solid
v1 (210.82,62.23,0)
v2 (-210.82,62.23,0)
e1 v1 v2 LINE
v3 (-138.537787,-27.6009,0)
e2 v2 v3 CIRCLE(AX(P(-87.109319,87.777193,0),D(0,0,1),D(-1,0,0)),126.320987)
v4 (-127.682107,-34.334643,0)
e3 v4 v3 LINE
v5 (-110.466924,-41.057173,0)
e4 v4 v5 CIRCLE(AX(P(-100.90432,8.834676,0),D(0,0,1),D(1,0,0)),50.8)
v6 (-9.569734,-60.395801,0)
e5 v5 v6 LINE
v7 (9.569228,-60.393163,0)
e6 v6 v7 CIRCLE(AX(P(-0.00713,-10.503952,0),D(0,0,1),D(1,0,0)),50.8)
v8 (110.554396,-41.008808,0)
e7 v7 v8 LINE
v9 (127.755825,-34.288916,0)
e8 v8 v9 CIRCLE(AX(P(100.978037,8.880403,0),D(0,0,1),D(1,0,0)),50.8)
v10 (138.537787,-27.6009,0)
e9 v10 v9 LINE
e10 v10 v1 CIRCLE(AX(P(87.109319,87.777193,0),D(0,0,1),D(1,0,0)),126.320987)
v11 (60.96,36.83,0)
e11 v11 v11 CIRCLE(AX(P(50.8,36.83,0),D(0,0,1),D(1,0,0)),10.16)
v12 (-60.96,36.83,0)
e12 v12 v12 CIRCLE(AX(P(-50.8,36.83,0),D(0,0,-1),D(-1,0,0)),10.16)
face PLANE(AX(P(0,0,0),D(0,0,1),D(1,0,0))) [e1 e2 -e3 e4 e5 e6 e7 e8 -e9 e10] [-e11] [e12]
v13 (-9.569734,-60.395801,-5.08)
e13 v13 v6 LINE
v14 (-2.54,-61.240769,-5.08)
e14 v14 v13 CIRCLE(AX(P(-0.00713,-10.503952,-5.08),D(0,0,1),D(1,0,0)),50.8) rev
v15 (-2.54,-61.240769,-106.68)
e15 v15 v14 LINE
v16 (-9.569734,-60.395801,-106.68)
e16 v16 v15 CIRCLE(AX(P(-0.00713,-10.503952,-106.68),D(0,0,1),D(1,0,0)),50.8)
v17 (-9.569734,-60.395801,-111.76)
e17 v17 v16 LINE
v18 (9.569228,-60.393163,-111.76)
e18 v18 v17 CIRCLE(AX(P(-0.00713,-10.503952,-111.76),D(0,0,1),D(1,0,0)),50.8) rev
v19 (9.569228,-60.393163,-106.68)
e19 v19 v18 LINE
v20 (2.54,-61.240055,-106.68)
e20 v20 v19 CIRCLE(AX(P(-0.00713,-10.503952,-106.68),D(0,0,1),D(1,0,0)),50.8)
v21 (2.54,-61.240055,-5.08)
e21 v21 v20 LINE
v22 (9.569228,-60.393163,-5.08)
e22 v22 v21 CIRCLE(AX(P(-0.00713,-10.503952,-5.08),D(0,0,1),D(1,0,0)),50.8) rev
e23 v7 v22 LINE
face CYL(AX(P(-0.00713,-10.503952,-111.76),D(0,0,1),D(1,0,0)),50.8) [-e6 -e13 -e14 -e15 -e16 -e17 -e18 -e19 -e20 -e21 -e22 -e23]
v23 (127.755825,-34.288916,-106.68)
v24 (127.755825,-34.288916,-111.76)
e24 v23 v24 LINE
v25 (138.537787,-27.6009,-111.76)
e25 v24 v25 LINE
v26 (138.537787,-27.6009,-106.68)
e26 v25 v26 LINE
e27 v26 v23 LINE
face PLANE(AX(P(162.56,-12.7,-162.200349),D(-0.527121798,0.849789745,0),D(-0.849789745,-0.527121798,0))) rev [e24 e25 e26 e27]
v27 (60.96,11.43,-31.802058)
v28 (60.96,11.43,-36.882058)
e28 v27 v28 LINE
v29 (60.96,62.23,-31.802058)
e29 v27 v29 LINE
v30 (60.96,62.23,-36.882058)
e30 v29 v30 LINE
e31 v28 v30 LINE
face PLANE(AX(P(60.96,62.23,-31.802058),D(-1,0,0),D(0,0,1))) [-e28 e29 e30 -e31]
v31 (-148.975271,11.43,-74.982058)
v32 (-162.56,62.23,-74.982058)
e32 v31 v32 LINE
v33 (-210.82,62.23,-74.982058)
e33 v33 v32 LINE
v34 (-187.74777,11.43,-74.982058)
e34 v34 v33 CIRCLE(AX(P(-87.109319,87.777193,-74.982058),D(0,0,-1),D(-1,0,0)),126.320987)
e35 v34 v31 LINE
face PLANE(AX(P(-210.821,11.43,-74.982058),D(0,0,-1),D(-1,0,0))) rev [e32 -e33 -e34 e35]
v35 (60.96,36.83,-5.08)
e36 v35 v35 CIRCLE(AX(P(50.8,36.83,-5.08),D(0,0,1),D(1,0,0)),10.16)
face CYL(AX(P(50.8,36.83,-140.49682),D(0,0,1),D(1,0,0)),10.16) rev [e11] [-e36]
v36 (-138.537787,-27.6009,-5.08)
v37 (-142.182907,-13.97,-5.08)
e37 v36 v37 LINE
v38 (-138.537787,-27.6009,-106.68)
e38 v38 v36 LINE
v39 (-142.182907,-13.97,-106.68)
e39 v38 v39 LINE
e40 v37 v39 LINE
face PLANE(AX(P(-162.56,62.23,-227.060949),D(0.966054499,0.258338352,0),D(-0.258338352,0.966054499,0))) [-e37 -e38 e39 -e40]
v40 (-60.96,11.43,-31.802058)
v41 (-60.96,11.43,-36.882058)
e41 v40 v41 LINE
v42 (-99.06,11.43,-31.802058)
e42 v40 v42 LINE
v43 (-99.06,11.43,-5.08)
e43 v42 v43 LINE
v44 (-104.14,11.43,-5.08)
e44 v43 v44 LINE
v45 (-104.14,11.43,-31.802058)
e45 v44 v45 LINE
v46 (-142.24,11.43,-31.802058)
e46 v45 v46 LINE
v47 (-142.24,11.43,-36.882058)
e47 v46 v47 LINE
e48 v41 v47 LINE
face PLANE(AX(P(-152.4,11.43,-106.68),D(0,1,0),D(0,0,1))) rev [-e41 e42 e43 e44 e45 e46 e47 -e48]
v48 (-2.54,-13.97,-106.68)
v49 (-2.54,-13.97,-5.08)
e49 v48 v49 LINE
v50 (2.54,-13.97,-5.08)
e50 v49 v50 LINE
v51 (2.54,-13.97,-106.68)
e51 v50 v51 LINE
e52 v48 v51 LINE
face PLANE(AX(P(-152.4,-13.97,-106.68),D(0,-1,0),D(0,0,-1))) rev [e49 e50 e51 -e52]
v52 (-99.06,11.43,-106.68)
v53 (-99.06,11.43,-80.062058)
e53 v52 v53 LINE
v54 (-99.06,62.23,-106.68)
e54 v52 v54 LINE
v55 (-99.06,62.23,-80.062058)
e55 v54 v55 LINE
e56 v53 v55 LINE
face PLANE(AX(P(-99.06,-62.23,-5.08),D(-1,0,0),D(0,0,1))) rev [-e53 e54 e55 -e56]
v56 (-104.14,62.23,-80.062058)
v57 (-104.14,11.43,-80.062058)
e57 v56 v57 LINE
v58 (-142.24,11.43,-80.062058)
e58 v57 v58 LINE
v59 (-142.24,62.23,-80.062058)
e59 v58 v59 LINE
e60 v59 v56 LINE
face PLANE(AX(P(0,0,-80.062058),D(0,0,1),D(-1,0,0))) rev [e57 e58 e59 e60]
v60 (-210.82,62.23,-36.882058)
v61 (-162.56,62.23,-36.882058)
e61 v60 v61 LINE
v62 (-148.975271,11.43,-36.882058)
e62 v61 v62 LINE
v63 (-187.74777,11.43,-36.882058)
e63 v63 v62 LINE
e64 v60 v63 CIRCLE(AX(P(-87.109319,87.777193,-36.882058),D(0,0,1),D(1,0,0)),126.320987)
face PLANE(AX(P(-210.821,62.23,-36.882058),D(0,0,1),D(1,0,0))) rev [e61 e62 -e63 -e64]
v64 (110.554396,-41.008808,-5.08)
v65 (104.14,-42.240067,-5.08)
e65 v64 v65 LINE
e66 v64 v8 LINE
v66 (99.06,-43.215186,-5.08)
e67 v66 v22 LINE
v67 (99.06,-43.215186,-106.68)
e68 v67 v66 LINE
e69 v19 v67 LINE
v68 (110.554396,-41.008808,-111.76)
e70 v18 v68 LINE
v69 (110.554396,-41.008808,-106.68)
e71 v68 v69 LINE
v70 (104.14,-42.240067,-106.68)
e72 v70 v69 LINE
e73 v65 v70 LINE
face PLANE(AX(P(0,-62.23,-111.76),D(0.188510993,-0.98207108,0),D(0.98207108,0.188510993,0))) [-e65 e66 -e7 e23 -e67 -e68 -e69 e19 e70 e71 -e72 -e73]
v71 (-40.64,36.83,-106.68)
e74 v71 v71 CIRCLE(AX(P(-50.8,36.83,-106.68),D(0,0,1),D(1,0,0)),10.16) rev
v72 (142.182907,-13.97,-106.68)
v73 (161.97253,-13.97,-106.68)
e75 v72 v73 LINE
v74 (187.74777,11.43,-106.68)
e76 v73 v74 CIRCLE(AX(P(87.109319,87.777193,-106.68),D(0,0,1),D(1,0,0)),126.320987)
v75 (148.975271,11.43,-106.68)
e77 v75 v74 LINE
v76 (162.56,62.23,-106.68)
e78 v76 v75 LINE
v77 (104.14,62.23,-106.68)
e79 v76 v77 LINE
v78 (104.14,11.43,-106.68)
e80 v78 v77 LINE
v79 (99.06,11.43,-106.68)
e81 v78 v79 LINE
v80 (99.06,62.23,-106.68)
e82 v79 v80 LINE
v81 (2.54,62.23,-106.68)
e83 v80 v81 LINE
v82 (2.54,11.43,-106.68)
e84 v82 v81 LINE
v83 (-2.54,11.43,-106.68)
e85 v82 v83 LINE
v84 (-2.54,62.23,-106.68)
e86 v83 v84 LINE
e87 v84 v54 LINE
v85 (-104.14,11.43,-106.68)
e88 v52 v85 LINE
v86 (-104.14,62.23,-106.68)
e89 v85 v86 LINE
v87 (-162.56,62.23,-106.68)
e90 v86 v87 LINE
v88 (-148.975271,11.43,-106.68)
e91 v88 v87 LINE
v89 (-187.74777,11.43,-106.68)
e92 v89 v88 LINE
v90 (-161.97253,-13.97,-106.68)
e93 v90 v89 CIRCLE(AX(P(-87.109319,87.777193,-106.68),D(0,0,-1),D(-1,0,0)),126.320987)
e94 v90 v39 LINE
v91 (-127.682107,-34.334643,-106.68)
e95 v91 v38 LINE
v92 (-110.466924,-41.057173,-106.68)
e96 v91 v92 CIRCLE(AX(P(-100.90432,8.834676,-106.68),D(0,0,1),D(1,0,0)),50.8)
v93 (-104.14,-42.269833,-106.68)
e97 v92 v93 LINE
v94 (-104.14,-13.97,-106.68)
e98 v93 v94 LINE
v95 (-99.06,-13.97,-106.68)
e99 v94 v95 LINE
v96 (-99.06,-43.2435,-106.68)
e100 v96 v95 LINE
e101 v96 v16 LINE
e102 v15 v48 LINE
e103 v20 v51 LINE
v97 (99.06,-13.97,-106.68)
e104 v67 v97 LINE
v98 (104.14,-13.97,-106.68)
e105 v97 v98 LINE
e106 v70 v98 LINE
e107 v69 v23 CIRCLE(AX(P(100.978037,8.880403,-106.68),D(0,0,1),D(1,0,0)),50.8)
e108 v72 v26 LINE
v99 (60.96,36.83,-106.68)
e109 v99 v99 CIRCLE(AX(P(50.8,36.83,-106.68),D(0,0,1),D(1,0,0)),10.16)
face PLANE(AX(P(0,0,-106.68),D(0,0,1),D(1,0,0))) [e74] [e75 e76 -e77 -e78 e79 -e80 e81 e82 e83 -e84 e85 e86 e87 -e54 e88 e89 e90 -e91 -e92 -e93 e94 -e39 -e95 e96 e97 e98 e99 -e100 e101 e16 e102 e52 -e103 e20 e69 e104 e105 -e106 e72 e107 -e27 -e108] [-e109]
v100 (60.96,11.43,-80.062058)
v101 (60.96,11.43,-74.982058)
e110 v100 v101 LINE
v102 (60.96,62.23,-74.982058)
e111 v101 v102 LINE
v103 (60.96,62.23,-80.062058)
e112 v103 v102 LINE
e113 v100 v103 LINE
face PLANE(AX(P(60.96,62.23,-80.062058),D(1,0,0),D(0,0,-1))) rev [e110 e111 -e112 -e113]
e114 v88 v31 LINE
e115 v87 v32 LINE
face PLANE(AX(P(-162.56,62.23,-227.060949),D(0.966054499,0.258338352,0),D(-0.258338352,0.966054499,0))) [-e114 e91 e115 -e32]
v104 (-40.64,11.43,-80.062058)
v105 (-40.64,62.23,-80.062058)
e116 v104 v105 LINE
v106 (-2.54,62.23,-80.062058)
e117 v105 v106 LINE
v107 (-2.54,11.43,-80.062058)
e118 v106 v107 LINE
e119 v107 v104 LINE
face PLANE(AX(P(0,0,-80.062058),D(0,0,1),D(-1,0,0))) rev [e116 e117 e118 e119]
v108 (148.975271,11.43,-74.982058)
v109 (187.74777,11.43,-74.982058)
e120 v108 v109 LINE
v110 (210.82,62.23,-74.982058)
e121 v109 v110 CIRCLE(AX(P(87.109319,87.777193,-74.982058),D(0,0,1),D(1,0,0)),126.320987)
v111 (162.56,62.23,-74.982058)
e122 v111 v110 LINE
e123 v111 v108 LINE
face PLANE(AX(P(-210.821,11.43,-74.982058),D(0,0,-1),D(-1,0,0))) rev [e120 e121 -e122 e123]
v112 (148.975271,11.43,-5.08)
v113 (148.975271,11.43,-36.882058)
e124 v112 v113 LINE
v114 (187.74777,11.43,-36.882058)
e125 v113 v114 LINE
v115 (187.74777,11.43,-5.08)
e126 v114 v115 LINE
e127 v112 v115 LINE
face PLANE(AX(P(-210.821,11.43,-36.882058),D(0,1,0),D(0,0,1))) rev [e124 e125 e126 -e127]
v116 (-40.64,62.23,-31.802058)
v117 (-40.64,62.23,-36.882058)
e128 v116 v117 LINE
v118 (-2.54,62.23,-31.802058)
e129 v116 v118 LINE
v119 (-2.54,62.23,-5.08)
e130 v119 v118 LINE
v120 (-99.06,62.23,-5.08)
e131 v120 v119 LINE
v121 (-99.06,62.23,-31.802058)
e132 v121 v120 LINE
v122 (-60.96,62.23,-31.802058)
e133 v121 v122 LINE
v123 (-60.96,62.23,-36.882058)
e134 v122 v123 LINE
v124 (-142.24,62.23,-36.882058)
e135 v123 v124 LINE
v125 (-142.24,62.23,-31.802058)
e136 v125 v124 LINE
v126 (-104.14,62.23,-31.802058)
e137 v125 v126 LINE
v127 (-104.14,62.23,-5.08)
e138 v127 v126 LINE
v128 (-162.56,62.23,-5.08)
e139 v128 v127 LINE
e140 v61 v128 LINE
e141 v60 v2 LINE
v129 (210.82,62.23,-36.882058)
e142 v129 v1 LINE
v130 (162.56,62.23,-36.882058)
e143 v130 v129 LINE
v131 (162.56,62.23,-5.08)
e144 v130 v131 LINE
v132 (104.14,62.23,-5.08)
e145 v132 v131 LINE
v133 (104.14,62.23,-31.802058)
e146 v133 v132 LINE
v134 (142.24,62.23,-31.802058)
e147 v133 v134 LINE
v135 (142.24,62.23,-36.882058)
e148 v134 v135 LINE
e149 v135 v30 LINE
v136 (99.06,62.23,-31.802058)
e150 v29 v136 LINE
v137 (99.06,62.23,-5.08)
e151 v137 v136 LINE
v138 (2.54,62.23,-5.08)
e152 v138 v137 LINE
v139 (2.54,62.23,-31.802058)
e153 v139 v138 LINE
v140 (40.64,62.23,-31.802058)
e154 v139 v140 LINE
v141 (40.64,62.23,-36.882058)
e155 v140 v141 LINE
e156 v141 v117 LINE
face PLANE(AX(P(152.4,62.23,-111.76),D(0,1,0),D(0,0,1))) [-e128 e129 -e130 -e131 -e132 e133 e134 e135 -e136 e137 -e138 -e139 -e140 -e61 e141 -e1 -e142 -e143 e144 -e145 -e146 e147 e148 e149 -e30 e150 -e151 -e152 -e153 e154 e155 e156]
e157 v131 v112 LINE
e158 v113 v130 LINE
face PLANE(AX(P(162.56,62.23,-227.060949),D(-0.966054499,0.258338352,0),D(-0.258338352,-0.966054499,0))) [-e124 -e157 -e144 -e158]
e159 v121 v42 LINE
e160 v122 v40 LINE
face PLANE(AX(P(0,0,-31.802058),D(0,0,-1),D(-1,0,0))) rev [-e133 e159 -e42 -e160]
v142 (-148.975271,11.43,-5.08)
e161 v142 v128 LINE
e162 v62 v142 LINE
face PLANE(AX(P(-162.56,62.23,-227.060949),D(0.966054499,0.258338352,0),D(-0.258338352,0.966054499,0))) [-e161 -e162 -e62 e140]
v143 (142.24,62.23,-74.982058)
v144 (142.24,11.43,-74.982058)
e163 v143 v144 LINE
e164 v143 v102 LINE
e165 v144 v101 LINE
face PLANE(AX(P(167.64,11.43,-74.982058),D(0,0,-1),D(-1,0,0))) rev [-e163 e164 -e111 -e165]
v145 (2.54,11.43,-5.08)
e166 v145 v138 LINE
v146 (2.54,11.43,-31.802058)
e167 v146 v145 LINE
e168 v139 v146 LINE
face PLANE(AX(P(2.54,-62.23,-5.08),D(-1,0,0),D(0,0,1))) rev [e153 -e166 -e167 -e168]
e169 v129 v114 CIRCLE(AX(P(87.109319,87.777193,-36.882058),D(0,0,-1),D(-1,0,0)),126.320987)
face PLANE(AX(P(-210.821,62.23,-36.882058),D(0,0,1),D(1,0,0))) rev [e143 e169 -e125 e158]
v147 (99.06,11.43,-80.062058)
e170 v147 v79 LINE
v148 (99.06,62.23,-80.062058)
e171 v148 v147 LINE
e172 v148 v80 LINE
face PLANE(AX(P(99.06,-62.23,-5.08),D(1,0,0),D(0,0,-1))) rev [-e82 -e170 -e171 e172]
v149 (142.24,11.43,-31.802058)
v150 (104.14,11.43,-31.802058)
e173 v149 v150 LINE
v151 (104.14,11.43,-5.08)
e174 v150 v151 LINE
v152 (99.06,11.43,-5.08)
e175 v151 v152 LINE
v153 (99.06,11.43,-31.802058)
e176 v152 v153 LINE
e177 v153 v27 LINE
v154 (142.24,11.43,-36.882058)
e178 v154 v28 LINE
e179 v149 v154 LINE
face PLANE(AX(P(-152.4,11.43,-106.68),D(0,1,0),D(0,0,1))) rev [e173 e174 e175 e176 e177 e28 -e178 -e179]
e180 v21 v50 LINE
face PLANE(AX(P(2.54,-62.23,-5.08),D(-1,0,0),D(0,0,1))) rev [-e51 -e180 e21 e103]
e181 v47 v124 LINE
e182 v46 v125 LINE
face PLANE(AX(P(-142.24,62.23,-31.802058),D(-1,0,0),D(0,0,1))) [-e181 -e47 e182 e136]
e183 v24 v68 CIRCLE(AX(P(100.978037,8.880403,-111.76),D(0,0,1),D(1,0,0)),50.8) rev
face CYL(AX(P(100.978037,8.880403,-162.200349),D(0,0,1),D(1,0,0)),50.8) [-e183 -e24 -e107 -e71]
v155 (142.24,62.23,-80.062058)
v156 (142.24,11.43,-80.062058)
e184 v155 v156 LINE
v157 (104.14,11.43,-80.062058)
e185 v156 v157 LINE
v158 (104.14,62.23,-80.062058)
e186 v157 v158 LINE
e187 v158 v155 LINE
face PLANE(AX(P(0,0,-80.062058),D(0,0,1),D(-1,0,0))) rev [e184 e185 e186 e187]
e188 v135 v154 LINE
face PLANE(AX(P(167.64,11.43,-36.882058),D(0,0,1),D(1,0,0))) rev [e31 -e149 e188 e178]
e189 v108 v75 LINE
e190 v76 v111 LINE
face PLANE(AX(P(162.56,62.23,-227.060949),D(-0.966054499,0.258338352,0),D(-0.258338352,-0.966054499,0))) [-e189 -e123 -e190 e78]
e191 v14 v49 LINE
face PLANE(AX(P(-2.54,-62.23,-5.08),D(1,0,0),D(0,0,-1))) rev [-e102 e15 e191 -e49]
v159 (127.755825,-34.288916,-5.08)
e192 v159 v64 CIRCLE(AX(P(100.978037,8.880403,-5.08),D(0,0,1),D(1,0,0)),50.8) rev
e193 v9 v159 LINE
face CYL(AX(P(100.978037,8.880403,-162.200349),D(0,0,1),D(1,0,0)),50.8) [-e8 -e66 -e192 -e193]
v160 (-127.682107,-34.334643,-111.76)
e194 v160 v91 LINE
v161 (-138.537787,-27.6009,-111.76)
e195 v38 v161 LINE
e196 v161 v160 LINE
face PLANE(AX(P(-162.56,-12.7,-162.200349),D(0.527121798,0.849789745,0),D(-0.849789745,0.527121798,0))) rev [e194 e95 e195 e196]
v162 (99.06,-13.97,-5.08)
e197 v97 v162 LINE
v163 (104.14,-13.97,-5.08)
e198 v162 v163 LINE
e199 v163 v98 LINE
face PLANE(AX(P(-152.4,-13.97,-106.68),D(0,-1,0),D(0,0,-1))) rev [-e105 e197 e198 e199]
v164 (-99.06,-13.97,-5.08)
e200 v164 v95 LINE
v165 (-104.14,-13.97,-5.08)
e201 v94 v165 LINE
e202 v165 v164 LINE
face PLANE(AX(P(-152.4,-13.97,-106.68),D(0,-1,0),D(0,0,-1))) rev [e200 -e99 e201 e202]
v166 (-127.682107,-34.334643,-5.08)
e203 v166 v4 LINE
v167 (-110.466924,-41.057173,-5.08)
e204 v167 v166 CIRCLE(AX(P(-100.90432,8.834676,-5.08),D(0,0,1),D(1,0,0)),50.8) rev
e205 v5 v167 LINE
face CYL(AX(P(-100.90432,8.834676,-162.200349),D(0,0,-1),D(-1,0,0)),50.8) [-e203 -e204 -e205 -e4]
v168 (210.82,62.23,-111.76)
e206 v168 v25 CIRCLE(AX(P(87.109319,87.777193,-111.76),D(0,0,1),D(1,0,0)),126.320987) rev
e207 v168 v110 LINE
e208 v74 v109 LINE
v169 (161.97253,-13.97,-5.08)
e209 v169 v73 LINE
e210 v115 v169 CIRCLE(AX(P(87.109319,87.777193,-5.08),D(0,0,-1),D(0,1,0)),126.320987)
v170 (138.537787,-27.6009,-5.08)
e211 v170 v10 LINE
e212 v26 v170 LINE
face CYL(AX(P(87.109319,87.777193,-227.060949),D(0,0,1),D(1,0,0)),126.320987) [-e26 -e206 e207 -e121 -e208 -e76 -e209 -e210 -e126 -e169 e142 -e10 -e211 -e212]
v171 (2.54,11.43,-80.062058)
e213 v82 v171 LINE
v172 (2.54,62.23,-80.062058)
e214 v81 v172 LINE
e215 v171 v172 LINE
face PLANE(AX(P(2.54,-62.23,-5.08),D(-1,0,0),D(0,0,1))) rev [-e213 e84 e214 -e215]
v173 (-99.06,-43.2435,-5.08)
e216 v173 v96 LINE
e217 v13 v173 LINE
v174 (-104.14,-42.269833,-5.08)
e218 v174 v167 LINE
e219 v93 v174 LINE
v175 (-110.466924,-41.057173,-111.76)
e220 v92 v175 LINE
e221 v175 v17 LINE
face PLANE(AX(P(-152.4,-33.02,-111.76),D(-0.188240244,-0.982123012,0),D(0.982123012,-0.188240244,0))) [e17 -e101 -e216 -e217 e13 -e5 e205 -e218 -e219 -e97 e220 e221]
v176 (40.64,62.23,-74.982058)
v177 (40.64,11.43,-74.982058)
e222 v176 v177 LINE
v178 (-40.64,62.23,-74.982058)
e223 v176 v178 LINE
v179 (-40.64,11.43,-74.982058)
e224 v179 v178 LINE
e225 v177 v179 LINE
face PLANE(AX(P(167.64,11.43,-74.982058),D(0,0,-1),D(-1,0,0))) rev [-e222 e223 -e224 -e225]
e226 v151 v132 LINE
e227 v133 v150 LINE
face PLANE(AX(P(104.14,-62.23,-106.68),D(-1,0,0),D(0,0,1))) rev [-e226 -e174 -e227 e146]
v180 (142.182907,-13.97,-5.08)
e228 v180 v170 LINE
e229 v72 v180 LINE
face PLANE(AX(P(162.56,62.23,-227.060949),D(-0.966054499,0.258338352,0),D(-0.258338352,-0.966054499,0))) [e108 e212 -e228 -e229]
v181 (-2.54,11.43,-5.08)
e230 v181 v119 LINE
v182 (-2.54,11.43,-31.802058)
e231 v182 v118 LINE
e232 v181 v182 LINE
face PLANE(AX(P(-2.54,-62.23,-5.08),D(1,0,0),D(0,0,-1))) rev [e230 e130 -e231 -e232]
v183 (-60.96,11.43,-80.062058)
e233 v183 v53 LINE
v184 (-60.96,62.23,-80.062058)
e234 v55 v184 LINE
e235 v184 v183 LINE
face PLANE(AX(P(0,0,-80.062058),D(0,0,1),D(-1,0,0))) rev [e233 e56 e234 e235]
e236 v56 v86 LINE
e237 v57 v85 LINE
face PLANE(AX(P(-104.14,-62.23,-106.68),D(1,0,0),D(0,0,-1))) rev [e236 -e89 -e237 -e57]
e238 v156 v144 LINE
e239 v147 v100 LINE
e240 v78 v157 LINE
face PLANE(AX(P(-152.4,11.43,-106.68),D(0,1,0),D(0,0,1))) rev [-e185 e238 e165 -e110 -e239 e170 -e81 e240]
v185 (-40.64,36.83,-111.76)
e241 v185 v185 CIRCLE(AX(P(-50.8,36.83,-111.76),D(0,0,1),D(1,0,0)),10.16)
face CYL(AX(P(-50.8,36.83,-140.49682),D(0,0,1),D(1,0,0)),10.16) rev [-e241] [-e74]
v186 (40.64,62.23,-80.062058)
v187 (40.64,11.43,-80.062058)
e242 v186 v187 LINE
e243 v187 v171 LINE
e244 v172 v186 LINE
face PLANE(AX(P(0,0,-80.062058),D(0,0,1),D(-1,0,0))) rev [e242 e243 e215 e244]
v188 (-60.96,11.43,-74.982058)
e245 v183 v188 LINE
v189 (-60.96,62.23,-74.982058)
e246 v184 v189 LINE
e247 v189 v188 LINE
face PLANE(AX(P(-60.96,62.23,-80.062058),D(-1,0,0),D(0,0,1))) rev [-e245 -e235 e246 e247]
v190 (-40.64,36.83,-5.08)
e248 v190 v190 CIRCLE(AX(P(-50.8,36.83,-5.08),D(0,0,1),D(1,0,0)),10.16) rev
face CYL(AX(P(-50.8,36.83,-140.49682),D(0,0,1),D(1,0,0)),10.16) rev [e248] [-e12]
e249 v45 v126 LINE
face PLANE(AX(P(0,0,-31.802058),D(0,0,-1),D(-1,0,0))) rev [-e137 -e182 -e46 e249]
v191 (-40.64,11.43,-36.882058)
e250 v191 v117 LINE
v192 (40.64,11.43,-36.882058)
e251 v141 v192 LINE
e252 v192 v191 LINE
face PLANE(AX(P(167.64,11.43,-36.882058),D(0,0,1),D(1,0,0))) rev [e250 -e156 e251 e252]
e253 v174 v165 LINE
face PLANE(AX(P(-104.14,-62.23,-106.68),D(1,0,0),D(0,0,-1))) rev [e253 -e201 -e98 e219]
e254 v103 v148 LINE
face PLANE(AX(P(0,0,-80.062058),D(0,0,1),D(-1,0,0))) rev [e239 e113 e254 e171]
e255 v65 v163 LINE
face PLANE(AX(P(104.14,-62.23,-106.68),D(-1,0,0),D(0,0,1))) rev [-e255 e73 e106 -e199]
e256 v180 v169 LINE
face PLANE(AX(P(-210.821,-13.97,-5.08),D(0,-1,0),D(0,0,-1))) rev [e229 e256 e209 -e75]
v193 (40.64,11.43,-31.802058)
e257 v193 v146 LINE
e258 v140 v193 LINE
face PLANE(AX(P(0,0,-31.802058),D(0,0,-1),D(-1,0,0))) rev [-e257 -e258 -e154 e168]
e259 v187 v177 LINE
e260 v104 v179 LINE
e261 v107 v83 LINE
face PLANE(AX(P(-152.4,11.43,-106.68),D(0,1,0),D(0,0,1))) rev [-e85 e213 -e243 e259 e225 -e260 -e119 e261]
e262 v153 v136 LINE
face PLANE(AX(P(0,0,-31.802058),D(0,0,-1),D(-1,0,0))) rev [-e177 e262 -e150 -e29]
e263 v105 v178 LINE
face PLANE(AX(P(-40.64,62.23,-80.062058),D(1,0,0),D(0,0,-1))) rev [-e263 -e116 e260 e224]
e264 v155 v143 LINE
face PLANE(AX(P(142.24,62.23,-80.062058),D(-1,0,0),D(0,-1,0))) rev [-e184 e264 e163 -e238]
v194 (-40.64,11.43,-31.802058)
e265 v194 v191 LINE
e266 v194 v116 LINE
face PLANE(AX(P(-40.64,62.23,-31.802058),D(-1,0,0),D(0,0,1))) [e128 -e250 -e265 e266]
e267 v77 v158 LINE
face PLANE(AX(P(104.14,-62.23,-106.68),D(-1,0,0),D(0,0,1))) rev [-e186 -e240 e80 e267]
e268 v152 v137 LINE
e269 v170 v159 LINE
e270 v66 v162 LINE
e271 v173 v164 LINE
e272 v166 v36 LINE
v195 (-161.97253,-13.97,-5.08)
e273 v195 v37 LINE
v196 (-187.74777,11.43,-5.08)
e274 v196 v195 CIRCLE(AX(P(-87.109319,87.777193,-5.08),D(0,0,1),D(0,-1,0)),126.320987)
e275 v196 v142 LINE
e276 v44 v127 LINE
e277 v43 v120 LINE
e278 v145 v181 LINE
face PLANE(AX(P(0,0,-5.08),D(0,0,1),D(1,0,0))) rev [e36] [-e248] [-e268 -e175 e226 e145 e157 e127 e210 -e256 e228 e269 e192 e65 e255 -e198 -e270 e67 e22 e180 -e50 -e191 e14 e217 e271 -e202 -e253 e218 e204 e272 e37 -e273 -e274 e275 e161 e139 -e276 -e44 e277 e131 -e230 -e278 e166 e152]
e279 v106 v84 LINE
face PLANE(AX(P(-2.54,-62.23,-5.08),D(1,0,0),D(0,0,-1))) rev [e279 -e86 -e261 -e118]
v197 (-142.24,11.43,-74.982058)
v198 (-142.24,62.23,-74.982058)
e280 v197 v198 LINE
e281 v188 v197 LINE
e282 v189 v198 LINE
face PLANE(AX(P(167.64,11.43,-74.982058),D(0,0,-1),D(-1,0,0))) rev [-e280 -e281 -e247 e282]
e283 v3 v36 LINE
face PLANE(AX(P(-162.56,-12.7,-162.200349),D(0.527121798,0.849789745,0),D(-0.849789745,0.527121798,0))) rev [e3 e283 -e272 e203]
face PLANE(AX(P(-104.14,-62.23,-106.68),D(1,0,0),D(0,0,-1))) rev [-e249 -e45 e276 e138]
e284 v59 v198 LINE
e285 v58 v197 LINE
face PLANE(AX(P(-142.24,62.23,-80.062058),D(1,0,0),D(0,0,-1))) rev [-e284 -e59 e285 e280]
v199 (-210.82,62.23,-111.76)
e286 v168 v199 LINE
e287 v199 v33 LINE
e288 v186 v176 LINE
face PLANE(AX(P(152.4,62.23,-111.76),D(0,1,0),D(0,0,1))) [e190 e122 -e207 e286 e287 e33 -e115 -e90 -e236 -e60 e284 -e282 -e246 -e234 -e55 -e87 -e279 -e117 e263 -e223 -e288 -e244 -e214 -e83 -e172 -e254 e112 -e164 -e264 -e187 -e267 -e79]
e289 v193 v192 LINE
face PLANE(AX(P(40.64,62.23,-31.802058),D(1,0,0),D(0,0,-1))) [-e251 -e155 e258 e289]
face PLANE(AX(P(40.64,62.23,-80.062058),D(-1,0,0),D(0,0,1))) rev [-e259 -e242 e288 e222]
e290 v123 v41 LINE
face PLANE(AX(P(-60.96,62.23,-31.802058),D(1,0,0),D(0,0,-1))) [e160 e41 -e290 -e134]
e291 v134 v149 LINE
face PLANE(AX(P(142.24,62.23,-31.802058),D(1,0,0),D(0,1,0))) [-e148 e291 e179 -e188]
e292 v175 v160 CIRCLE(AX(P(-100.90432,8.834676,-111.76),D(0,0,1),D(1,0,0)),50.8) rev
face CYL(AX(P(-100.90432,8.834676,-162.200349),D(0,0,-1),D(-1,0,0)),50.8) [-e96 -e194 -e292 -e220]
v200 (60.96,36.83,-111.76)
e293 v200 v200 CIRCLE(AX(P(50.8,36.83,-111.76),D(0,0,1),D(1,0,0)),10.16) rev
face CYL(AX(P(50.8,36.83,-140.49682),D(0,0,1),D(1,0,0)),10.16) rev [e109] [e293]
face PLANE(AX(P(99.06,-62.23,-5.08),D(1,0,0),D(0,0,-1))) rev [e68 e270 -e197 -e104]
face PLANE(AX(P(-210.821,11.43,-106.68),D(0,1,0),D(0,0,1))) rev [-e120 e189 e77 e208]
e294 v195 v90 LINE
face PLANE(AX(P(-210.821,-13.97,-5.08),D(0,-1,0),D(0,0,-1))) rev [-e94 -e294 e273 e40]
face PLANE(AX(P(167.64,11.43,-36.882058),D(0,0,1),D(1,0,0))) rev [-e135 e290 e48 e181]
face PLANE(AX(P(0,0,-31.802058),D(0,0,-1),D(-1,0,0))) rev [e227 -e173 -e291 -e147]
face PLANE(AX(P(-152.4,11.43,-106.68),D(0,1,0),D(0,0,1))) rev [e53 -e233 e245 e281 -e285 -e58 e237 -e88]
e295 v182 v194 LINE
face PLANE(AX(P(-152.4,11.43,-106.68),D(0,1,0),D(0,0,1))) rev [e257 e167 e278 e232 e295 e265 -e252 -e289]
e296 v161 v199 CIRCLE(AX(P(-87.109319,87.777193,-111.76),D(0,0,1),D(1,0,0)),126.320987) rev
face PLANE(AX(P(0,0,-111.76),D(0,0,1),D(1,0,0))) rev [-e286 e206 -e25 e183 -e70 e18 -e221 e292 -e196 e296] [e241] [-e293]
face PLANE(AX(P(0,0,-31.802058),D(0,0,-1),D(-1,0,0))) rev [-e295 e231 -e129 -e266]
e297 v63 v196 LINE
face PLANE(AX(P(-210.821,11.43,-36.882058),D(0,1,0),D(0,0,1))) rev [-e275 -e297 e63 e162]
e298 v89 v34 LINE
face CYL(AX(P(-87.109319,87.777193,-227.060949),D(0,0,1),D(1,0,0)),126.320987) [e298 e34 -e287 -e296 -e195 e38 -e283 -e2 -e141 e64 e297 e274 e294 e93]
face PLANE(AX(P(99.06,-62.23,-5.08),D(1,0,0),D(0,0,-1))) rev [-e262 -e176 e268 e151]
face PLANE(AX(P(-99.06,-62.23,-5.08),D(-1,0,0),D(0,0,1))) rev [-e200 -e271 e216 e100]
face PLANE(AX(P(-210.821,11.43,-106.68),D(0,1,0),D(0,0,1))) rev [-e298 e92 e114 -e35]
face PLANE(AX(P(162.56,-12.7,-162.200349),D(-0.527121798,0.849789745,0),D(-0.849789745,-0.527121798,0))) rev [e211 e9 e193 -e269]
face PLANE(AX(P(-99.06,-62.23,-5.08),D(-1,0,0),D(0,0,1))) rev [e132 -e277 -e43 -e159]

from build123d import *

# Parameters (mm, degrees)
BOSS_EXTRUDE1_DEPTH                 = 111.76
SKETCH5_W                           = 304.8
SKETCH5_H                           = 25.4
CUT_EXTRUDE3_DEPTH                  = 101.6
CUT_EXTRUDE4_DEPTH                  = 227.288199427
CUT_EXTRUDE4_DEPTH_BACK             = 227.288199427
SKETCH3_W                           = 96.52
SKETCH3_H                           = 101.6
SKETCH3_W_2                         = 48.26
CUT_EXTRUDE5_REACH                  = 288.663
SKETCH6_W                           = 38.1
SKETCH6_H                           = 50.8
SKETCH7_W                           = 81.28
SKETCH7_H                           = 50.8
BOSS_EXTRUDE2_DEPTH                 = 5.08
CUT_EXTRUDE6_REACH                  = 200.969
SKETCH8_R                           = 10.16
SKETCH9_W                           = 5.08
SKETCH9_H                           = 95.25
BOSS_EXTRUDE3_DEPTH                 = 10.16
SKETCH10_W                          = 5.08
SKETCH10_H                          = 95.206439839
BOSS_EXTRUDE4_DEPTH                 = 10.16
CUT_EXTRUDE7_REACH                  = 208.854
FILLET1_R                           = 50.8
BOSS_EXTRUDE5_REACH                 = 208.854
CUT_EXTRUDE8_REACH                  = 248.593
CUT_EXTRUDE8_END_RADIUS             = 126.32098656
CUT_EXTRUDE8_DIRECTION_2_REACH      = 248.593
CUT_EXTRUDE8_DIRECTION_2_END_RADIUS = 126.32098656


with BuildPart() as part:
    # Sketch1 → Boss-Extrude1 (new body)
    with BuildSketch(Plane.XY):
        Polygon((-152.4, 62.23), (-152.4, -33.02), (0, -62.23), (152.4, -32.976439839), (152.4, 62.23), align=None)
    extrude(amount=-BOSS_EXTRUDE1_DEPTH)

    # Sketch5 → Cut-Extrude3 (cut)
    with BuildSketch(Plane.XY.offset(-5.08)):
        with Locations((0, -1.27)):
            Rectangle(SKETCH5_W, SKETCH5_H)
    extrude(amount=-CUT_EXTRUDE3_DEPTH, mode=Mode.SUBTRACT)

    # Sketch3 → Cut-Extrude4 (cut, two sides: drawn at the far end of the back side and taken through both)
    with BuildSketch(Plane(origin=(0, 62.23, 0), x_dir=(1, 0, 0), z_dir=(0, 1, 0)).offset(-CUT_EXTRUDE4_DEPTH_BACK)):
        with Locations((-50.8, 55.88)):
            Rectangle(SKETCH3_W, SKETCH3_H)
        with Locations((50.8, 55.88)):
            Rectangle(SKETCH3_W, SKETCH3_H)
        with Locations((-128.27, 55.88)):
            Rectangle(SKETCH3_W_2, SKETCH3_H)
        with Locations((128.27, 55.88)):
            Rectangle(SKETCH3_W_2, SKETCH3_H)
    extrude(amount=CUT_EXTRUDE4_DEPTH + CUT_EXTRUDE4_DEPTH_BACK, mode=Mode.SUBTRACT)

    # Cut-Extrude5: up to this face of the body (flat: up to its plane)
    cut_extrude5_end = Plane(part.part.faces().sort_by_distance((104.14, 36.83, -55.88))[0])
    # Sketch6 → Cut-Extrude5 (cut, up to the picked face)
    with BuildSketch(Plane.ZY.offset(104.14), mode=Mode.PRIVATE) as cut_extrude5_sk1:
        with Locations((-55.932057734, 36.83)):
            Rectangle(SKETCH6_W, SKETCH6_H)
    cut_extrude5_tool1 = split(extrude(cut_extrude5_sk1.sketch, amount=-CUT_EXTRUDE5_REACH, mode=Mode.PRIVATE), bisect_by=cut_extrude5_end, keep=Keep.BOTH, mode=Mode.PRIVATE)
    add(cut_extrude5_tool1.solids().sort_by(Axis((-104.14, 36.83, -55.932058), (1, 0, 0)))[0], mode=Mode.SUBTRACT)

    # Sketch7 → Boss-Extrude2 (add)
    with BuildSketch(Plane(origin=(0, 0, -36.882057734), x_dir=(-1, 0, 0), z_dir=(0, 0, -1))):
        with Locations((0, 36.83)):
            Rectangle(SKETCH7_W, SKETCH7_H)
        with Locations((101.6, 36.83)):
            Rectangle(SKETCH7_W, SKETCH7_H)
        with Locations((-101.6, 36.83)):
            Rectangle(SKETCH7_W, SKETCH7_H)
    boss_extrude2 = extrude(amount=-BOSS_EXTRUDE2_DEPTH)

    # Mirror1: Boss-Extrude2 across plane
    add(boss_extrude2.mirror(Plane(origin=(0, 0, -55.932057734), x_dir=(1, 0, 0), z_dir=(0, 0, -1))))

    # Cut-Extrude6: up to this face of the body (flat: up to its plane)
    cut_extrude6_end = Plane(part.part.faces().sort_by_distance((-0.010072712, 6.983811852, -111.76))[0])
    # Sketch8 → Cut-Extrude6 (cut, up to the picked face)
    with BuildSketch(Plane.XY, mode=Mode.PRIVATE) as cut_extrude6_sk1:
        with Locations((50.8, 36.83)):
            Circle(SKETCH8_R)
    cut_extrude6_tool1 = split(extrude(cut_extrude6_sk1.sketch, amount=-CUT_EXTRUDE6_REACH, mode=Mode.PRIVATE), bisect_by=cut_extrude6_end, keep=Keep.BOTH, mode=Mode.PRIVATE)
    cut_extrude6 = cut_extrude6_tool1.solids().sort_by(Axis((50.8, 36.83, 0), (0, 0, -1)))[0]
    add(cut_extrude6, mode=Mode.SUBTRACT)

    # Mirror2: Cut-Extrude6 across plane
    add(cut_extrude6.mirror(Plane(origin=(0, 0, 0), x_dir=(0, 0, 1), z_dir=(1, 0, 0))), mode=Mode.SUBTRACT)

    # Sketch9 → Boss-Extrude3 (add)
    with BuildSketch(Plane.ZY.offset(152.4)):
        with Locations((-109.22, 14.605)):
            Rectangle(SKETCH9_W, SKETCH9_H)
        with Locations((-2.54, 14.605)):
            Rectangle(SKETCH9_W, SKETCH9_H)
    extrude(amount=BOSS_EXTRUDE3_DEPTH)

    # Sketch10 → Boss-Extrude4 (add)
    with BuildSketch(Plane(origin=(152.4, 0, 0), x_dir=(0, 0, -1), z_dir=(1, 0, 0))):
        with Locations((2.54, 14.626780081)):
            Rectangle(SKETCH10_W, SKETCH10_H)
        with Locations((109.22, 14.626780081)):
            Rectangle(SKETCH10_W, SKETCH10_H)
    extrude(amount=BOSS_EXTRUDE4_DEPTH)

    # Cut-Extrude7: up to this face of the body (flat: up to its plane)
    cut_extrude7_end = Plane(part.part.faces().sort_by_distance((-0.011704667, 6.851805545, -111.76))[0])
    # Sketch11 → Cut-Extrude7 (cut, up to the picked face)
    with BuildSketch(Plane.XY, mode=Mode.PRIVATE) as cut_extrude7_sk1:
        Polygon((-162.56, -12.7), (-119.696308585, -39.288207521), (-152.4, -33.02), (-162.56, -33.02), align=None)
    cut_extrude7_tool1 = split(extrude(cut_extrude7_sk1.sketch, amount=-CUT_EXTRUDE7_REACH, mode=Mode.PRIVATE), bisect_by=cut_extrude7_end, keep=Keep.BOTH, mode=Mode.PRIVATE)
    # Sketch11 → Cut-Extrude7 (cut, up to the picked face)
    with BuildSketch(Plane.XY, mode=Mode.PRIVATE) as cut_extrude7_sk2:
        Polygon((152.4, -33.02), (162.56, -33.02), (162.56, -12.7), (119.696308585, -39.288207521), align=None)
    cut_extrude7_tool2 = split(extrude(cut_extrude7_sk2.sketch, amount=-CUT_EXTRUDE7_REACH, mode=Mode.PRIVATE), bisect_by=cut_extrude7_end, keep=Keep.BOTH, mode=Mode.PRIVATE)
    add(cut_extrude7_tool1.solids().sort_by(Axis((-148.539263, -27.801749, 0), (0, 0, -1)))[0], mode=Mode.SUBTRACT)
    add(cut_extrude7_tool2.solids().sort_by(Axis((148.539263, -27.801749, 0), (0, 0, -1)))[0], mode=Mode.SUBTRACT)

    # Fillet1
    # the kernel refuses this fillet: 50.8 mm, written as the material it takes off along each edge
    with BuildSketch(Plane(origin=(-162.56, -12.7, 70.671047804), x_dir=(0.8497897447130388, -0.5271217978613181, 0), z_dir=(0, 0, -1)), Plane(origin=(-162.56, -12.7, -36.008952196), x_dir=(0.8497897447130388, -0.5271217978613181, 0), z_dir=(0, 0, -1)), Plane(origin=(162.56, -12.7, 70.671047804), x_dir=(0, 1, 0), z_dir=(0, 0, -1))) as fillet1_piece_1:
        with BuildLine():
            CenterArc((FILLET1_R * 0.556464943335, -FILLET1_R), FILLET1_R, 90, 58.188808221)
            Line((-FILLET1_R * 0.293324801378, -FILLET1_R * 0.472878202139), (0, 0))
            Line((0, 0), (FILLET1_R * 0.556464943335, 0))
        make_face()
    extrude(amount=146.422095607, mode=Mode.SUBTRACT)
    with BuildSketch(Plane(origin=(-119.696308585, -39.288207521, -83.186546401), x_dir=(0.9821230119270369, -0.18824024395268216, 0), z_dir=(0, 0, -1)), Plane(origin=(-119.696308585, -39.288207521, 23.493453599), x_dir=(0.9821230119270369, -0.18824024395268216, 0), z_dir=(0, 0, -1))) as fillet1_piece_2:
        with BuildLine():
            CenterArc((FILLET1_R * 0.184987823618, -FILLET1_R), FILLET1_R, 90, 20.961087149)
            Line((-FILLET1_R * 0.172745995297, -FILLET1_R * 0.0661764005955), (0, 0))
            Line((0, 0), (FILLET1_R * 0.184987823618, 0))
        make_face()
    extrude(amount=52.066907199, mode=Mode.SUBTRACT)
    with BuildSketch(Plane(origin=(162.56, -12.7, -36.008952196), x_dir=(-0.8497897447130388, -0.5271217978613181, 0), z_dir=(0, 0, -1))) as fillet1_piece_3:
        with BuildLine():
            CenterArc((FILLET1_R * 0.556464943335, FILLET1_R), FILLET1_R, 211.811191779, 58.188808221)
            Line((-FILLET1_R * 0.293324801378, FILLET1_R * 0.472878202139), (0, 0))
            Line((0, 0), (FILLET1_R * 0.556464943335, 0))
        make_face()
    extrude(amount=146.422095607, mode=Mode.SUBTRACT)
    with BuildSketch(Plane(origin=(119.776180176, -39.238663434, 23.475348992), x_dir=(-0.9820710795721669, -0.18851099349363817, 0), z_dir=(0, 0, -1)), Plane(origin=(119.776180176, -39.238663434, -83.204651008), x_dir=(-0.9820710795721669, -0.18851099349363817, 0), z_dir=(0, 0, -1))) as fillet1_piece_4:
        with BuildLine():
            CenterArc((FILLET1_R * 0.184845267653, FILLET1_R), FILLET1_R, 249.054708445, 20.945291555)
            Line((-FILLET1_R * 0.172631096402, FILLET1_R * 0.0660778141933), (0, 0))
            Line((0, 0), (FILLET1_R * 0.184845267653, 0))
        make_face()
    extrude(amount=52.030697984, mode=Mode.SUBTRACT)
    with BuildSketch(Plane(origin=(0, -62.23, 24.359816254), x_dir=(-0.982123011927037, 0.1882402439526816, 0), z_dir=(0, 0, -1))) as fillet1_piece_5:
        with BuildLine():
            CenterArc((FILLET1_R * 0.191809576801, FILLET1_R), FILLET1_R, 248.283995147, 21.716004853)
            Line((-FILLET1_R * 0.178196707507, FILLET1_R * 0.0709707488072), (0, 0))
            Line((0, 0), (FILLET1_R * 0.191809576801, 0))
        make_face()
    extrude(amount=160.479632508, mode=Mode.SUBTRACT)

    # Boss-Extrude5: up to this face of the body (flat: up to its plane)
    boss_extrude5_end = Plane(part.part.faces().sort_by_distance((-0.004823682, 7.831331811, -111.76))[0])
    # Sketch12 → Boss-Extrude5 (add, up to the picked face)
    with BuildSketch(Plane.XY, mode=Mode.PRIVATE) as boss_extrude5_sk1:
        with BuildLine():
            Line((-162.56, 62.23), (-210.82, 62.23))
            ThreePointArc((-210.82, 62.23), (-185.525923559, 8.586514121), (-138.537787331, -27.60089991))
            Line((-138.537787331, -27.60089991), (-162.56, 62.23))
        make_face()
    boss_extrude5_tool1 = split(extrude(boss_extrude5_sk1.sketch, amount=-BOSS_EXTRUDE5_REACH, mode=Mode.PRIVATE), bisect_by=boss_extrude5_end, keep=Keep.BOTH, mode=Mode.PRIVATE)
    # Sketch12 → Boss-Extrude5 (add, up to the picked face)
    with BuildSketch(Plane.XY, mode=Mode.PRIVATE) as boss_extrude5_sk2:
        with BuildLine():
            Line((162.56, 62.23), (210.82, 62.23))
            ThreePointArc((210.82, 62.23), (185.525923559, 8.586514121), (138.537787331, -27.60089991))
            Line((138.537787331, -27.60089991), (162.56, 62.23))
        make_face()
    boss_extrude5_tool2 = split(extrude(boss_extrude5_sk2.sketch, amount=-BOSS_EXTRUDE5_REACH, mode=Mode.PRIVATE), bisect_by=boss_extrude5_end, keep=Keep.BOTH, mode=Mode.PRIVATE)
    add(boss_extrude5_tool1.solids().sort_by(Axis((-173.436994, 26.131053, 0), (0, 0, -1)))[0])
    add(boss_extrude5_tool2.solids().sort_by(Axis((173.436994, 26.131053, 0), (0, 0, -1)))[0])

    # Cut-Extrude8: up to this cylinder (the profile starts inside it)
    cut_extrude8_end = Plane(origin=(-87.109319049, 87.777192878, -55.90231), z_dir=(0, 0, 1)) * Cylinder(CUT_EXTRUDE8_END_RADIUS, 750.827973119, mode=Mode.PRIVATE)
    # Sketch13 → Cut-Extrude8 (cut, up to the surface)
    with BuildSketch(Plane(origin=(0, 0, 0), x_dir=(0, 0, -1), z_dir=(1, 0, 0)), mode=Mode.PRIVATE) as cut_extrude8_sk1:
        Polygon((36.882057734, 62.23), (36.882057734, 11.43), (5.08, 11.43), (5.08, -13.97), (106.68, -13.97), (106.68, 11.43), (74.982057734, 11.43), (74.982057734, 62.23), align=None)
    cut_extrude8_tool1 = extrude(cut_extrude8_sk1.sketch, amount=-CUT_EXTRUDE8_REACH, mode=Mode.PRIVATE) & cut_extrude8_end
    add(cut_extrude8_tool1.solids().sort_by_distance((0, 15.058571, -55.90231))[0], mode=Mode.SUBTRACT)

    # Cut-Extrude8 direction 2: up to this cylinder (the profile starts inside it)
    cut_extrude8_direction_2_end = Plane(origin=(87.109319049, 87.777192878, -55.90231), z_dir=(0, 0, 1)) * Cylinder(CUT_EXTRUDE8_DIRECTION_2_END_RADIUS, 750.827973119, mode=Mode.PRIVATE)
    # Sketch13 → Cut-Extrude8 direction 2 (cut, up to the surface)
    with BuildSketch(Plane(origin=(0, 0, 0), x_dir=(0, 0, -1), z_dir=(1, 0, 0)), mode=Mode.PRIVATE) as cut_extrude8_direction_2_sk1:
        Polygon((36.882057734, 62.23), (36.882057734, 11.43), (5.08, 11.43), (5.08, -13.97), (106.68, -13.97), (106.68, 11.43), (74.982057734, 11.43), (74.982057734, 62.23), align=None)
    cut_extrude8_direction_2_tool1 = extrude(cut_extrude8_direction_2_sk1.sketch, amount=CUT_EXTRUDE8_DIRECTION_2_REACH, mode=Mode.PRIVATE) & cut_extrude8_direction_2_end
    add(cut_extrude8_direction_2_tool1.solids().sort_by_distance((0, 15.058571, -55.90231))[0], mode=Mode.SUBTRACT)


solid = part.part
